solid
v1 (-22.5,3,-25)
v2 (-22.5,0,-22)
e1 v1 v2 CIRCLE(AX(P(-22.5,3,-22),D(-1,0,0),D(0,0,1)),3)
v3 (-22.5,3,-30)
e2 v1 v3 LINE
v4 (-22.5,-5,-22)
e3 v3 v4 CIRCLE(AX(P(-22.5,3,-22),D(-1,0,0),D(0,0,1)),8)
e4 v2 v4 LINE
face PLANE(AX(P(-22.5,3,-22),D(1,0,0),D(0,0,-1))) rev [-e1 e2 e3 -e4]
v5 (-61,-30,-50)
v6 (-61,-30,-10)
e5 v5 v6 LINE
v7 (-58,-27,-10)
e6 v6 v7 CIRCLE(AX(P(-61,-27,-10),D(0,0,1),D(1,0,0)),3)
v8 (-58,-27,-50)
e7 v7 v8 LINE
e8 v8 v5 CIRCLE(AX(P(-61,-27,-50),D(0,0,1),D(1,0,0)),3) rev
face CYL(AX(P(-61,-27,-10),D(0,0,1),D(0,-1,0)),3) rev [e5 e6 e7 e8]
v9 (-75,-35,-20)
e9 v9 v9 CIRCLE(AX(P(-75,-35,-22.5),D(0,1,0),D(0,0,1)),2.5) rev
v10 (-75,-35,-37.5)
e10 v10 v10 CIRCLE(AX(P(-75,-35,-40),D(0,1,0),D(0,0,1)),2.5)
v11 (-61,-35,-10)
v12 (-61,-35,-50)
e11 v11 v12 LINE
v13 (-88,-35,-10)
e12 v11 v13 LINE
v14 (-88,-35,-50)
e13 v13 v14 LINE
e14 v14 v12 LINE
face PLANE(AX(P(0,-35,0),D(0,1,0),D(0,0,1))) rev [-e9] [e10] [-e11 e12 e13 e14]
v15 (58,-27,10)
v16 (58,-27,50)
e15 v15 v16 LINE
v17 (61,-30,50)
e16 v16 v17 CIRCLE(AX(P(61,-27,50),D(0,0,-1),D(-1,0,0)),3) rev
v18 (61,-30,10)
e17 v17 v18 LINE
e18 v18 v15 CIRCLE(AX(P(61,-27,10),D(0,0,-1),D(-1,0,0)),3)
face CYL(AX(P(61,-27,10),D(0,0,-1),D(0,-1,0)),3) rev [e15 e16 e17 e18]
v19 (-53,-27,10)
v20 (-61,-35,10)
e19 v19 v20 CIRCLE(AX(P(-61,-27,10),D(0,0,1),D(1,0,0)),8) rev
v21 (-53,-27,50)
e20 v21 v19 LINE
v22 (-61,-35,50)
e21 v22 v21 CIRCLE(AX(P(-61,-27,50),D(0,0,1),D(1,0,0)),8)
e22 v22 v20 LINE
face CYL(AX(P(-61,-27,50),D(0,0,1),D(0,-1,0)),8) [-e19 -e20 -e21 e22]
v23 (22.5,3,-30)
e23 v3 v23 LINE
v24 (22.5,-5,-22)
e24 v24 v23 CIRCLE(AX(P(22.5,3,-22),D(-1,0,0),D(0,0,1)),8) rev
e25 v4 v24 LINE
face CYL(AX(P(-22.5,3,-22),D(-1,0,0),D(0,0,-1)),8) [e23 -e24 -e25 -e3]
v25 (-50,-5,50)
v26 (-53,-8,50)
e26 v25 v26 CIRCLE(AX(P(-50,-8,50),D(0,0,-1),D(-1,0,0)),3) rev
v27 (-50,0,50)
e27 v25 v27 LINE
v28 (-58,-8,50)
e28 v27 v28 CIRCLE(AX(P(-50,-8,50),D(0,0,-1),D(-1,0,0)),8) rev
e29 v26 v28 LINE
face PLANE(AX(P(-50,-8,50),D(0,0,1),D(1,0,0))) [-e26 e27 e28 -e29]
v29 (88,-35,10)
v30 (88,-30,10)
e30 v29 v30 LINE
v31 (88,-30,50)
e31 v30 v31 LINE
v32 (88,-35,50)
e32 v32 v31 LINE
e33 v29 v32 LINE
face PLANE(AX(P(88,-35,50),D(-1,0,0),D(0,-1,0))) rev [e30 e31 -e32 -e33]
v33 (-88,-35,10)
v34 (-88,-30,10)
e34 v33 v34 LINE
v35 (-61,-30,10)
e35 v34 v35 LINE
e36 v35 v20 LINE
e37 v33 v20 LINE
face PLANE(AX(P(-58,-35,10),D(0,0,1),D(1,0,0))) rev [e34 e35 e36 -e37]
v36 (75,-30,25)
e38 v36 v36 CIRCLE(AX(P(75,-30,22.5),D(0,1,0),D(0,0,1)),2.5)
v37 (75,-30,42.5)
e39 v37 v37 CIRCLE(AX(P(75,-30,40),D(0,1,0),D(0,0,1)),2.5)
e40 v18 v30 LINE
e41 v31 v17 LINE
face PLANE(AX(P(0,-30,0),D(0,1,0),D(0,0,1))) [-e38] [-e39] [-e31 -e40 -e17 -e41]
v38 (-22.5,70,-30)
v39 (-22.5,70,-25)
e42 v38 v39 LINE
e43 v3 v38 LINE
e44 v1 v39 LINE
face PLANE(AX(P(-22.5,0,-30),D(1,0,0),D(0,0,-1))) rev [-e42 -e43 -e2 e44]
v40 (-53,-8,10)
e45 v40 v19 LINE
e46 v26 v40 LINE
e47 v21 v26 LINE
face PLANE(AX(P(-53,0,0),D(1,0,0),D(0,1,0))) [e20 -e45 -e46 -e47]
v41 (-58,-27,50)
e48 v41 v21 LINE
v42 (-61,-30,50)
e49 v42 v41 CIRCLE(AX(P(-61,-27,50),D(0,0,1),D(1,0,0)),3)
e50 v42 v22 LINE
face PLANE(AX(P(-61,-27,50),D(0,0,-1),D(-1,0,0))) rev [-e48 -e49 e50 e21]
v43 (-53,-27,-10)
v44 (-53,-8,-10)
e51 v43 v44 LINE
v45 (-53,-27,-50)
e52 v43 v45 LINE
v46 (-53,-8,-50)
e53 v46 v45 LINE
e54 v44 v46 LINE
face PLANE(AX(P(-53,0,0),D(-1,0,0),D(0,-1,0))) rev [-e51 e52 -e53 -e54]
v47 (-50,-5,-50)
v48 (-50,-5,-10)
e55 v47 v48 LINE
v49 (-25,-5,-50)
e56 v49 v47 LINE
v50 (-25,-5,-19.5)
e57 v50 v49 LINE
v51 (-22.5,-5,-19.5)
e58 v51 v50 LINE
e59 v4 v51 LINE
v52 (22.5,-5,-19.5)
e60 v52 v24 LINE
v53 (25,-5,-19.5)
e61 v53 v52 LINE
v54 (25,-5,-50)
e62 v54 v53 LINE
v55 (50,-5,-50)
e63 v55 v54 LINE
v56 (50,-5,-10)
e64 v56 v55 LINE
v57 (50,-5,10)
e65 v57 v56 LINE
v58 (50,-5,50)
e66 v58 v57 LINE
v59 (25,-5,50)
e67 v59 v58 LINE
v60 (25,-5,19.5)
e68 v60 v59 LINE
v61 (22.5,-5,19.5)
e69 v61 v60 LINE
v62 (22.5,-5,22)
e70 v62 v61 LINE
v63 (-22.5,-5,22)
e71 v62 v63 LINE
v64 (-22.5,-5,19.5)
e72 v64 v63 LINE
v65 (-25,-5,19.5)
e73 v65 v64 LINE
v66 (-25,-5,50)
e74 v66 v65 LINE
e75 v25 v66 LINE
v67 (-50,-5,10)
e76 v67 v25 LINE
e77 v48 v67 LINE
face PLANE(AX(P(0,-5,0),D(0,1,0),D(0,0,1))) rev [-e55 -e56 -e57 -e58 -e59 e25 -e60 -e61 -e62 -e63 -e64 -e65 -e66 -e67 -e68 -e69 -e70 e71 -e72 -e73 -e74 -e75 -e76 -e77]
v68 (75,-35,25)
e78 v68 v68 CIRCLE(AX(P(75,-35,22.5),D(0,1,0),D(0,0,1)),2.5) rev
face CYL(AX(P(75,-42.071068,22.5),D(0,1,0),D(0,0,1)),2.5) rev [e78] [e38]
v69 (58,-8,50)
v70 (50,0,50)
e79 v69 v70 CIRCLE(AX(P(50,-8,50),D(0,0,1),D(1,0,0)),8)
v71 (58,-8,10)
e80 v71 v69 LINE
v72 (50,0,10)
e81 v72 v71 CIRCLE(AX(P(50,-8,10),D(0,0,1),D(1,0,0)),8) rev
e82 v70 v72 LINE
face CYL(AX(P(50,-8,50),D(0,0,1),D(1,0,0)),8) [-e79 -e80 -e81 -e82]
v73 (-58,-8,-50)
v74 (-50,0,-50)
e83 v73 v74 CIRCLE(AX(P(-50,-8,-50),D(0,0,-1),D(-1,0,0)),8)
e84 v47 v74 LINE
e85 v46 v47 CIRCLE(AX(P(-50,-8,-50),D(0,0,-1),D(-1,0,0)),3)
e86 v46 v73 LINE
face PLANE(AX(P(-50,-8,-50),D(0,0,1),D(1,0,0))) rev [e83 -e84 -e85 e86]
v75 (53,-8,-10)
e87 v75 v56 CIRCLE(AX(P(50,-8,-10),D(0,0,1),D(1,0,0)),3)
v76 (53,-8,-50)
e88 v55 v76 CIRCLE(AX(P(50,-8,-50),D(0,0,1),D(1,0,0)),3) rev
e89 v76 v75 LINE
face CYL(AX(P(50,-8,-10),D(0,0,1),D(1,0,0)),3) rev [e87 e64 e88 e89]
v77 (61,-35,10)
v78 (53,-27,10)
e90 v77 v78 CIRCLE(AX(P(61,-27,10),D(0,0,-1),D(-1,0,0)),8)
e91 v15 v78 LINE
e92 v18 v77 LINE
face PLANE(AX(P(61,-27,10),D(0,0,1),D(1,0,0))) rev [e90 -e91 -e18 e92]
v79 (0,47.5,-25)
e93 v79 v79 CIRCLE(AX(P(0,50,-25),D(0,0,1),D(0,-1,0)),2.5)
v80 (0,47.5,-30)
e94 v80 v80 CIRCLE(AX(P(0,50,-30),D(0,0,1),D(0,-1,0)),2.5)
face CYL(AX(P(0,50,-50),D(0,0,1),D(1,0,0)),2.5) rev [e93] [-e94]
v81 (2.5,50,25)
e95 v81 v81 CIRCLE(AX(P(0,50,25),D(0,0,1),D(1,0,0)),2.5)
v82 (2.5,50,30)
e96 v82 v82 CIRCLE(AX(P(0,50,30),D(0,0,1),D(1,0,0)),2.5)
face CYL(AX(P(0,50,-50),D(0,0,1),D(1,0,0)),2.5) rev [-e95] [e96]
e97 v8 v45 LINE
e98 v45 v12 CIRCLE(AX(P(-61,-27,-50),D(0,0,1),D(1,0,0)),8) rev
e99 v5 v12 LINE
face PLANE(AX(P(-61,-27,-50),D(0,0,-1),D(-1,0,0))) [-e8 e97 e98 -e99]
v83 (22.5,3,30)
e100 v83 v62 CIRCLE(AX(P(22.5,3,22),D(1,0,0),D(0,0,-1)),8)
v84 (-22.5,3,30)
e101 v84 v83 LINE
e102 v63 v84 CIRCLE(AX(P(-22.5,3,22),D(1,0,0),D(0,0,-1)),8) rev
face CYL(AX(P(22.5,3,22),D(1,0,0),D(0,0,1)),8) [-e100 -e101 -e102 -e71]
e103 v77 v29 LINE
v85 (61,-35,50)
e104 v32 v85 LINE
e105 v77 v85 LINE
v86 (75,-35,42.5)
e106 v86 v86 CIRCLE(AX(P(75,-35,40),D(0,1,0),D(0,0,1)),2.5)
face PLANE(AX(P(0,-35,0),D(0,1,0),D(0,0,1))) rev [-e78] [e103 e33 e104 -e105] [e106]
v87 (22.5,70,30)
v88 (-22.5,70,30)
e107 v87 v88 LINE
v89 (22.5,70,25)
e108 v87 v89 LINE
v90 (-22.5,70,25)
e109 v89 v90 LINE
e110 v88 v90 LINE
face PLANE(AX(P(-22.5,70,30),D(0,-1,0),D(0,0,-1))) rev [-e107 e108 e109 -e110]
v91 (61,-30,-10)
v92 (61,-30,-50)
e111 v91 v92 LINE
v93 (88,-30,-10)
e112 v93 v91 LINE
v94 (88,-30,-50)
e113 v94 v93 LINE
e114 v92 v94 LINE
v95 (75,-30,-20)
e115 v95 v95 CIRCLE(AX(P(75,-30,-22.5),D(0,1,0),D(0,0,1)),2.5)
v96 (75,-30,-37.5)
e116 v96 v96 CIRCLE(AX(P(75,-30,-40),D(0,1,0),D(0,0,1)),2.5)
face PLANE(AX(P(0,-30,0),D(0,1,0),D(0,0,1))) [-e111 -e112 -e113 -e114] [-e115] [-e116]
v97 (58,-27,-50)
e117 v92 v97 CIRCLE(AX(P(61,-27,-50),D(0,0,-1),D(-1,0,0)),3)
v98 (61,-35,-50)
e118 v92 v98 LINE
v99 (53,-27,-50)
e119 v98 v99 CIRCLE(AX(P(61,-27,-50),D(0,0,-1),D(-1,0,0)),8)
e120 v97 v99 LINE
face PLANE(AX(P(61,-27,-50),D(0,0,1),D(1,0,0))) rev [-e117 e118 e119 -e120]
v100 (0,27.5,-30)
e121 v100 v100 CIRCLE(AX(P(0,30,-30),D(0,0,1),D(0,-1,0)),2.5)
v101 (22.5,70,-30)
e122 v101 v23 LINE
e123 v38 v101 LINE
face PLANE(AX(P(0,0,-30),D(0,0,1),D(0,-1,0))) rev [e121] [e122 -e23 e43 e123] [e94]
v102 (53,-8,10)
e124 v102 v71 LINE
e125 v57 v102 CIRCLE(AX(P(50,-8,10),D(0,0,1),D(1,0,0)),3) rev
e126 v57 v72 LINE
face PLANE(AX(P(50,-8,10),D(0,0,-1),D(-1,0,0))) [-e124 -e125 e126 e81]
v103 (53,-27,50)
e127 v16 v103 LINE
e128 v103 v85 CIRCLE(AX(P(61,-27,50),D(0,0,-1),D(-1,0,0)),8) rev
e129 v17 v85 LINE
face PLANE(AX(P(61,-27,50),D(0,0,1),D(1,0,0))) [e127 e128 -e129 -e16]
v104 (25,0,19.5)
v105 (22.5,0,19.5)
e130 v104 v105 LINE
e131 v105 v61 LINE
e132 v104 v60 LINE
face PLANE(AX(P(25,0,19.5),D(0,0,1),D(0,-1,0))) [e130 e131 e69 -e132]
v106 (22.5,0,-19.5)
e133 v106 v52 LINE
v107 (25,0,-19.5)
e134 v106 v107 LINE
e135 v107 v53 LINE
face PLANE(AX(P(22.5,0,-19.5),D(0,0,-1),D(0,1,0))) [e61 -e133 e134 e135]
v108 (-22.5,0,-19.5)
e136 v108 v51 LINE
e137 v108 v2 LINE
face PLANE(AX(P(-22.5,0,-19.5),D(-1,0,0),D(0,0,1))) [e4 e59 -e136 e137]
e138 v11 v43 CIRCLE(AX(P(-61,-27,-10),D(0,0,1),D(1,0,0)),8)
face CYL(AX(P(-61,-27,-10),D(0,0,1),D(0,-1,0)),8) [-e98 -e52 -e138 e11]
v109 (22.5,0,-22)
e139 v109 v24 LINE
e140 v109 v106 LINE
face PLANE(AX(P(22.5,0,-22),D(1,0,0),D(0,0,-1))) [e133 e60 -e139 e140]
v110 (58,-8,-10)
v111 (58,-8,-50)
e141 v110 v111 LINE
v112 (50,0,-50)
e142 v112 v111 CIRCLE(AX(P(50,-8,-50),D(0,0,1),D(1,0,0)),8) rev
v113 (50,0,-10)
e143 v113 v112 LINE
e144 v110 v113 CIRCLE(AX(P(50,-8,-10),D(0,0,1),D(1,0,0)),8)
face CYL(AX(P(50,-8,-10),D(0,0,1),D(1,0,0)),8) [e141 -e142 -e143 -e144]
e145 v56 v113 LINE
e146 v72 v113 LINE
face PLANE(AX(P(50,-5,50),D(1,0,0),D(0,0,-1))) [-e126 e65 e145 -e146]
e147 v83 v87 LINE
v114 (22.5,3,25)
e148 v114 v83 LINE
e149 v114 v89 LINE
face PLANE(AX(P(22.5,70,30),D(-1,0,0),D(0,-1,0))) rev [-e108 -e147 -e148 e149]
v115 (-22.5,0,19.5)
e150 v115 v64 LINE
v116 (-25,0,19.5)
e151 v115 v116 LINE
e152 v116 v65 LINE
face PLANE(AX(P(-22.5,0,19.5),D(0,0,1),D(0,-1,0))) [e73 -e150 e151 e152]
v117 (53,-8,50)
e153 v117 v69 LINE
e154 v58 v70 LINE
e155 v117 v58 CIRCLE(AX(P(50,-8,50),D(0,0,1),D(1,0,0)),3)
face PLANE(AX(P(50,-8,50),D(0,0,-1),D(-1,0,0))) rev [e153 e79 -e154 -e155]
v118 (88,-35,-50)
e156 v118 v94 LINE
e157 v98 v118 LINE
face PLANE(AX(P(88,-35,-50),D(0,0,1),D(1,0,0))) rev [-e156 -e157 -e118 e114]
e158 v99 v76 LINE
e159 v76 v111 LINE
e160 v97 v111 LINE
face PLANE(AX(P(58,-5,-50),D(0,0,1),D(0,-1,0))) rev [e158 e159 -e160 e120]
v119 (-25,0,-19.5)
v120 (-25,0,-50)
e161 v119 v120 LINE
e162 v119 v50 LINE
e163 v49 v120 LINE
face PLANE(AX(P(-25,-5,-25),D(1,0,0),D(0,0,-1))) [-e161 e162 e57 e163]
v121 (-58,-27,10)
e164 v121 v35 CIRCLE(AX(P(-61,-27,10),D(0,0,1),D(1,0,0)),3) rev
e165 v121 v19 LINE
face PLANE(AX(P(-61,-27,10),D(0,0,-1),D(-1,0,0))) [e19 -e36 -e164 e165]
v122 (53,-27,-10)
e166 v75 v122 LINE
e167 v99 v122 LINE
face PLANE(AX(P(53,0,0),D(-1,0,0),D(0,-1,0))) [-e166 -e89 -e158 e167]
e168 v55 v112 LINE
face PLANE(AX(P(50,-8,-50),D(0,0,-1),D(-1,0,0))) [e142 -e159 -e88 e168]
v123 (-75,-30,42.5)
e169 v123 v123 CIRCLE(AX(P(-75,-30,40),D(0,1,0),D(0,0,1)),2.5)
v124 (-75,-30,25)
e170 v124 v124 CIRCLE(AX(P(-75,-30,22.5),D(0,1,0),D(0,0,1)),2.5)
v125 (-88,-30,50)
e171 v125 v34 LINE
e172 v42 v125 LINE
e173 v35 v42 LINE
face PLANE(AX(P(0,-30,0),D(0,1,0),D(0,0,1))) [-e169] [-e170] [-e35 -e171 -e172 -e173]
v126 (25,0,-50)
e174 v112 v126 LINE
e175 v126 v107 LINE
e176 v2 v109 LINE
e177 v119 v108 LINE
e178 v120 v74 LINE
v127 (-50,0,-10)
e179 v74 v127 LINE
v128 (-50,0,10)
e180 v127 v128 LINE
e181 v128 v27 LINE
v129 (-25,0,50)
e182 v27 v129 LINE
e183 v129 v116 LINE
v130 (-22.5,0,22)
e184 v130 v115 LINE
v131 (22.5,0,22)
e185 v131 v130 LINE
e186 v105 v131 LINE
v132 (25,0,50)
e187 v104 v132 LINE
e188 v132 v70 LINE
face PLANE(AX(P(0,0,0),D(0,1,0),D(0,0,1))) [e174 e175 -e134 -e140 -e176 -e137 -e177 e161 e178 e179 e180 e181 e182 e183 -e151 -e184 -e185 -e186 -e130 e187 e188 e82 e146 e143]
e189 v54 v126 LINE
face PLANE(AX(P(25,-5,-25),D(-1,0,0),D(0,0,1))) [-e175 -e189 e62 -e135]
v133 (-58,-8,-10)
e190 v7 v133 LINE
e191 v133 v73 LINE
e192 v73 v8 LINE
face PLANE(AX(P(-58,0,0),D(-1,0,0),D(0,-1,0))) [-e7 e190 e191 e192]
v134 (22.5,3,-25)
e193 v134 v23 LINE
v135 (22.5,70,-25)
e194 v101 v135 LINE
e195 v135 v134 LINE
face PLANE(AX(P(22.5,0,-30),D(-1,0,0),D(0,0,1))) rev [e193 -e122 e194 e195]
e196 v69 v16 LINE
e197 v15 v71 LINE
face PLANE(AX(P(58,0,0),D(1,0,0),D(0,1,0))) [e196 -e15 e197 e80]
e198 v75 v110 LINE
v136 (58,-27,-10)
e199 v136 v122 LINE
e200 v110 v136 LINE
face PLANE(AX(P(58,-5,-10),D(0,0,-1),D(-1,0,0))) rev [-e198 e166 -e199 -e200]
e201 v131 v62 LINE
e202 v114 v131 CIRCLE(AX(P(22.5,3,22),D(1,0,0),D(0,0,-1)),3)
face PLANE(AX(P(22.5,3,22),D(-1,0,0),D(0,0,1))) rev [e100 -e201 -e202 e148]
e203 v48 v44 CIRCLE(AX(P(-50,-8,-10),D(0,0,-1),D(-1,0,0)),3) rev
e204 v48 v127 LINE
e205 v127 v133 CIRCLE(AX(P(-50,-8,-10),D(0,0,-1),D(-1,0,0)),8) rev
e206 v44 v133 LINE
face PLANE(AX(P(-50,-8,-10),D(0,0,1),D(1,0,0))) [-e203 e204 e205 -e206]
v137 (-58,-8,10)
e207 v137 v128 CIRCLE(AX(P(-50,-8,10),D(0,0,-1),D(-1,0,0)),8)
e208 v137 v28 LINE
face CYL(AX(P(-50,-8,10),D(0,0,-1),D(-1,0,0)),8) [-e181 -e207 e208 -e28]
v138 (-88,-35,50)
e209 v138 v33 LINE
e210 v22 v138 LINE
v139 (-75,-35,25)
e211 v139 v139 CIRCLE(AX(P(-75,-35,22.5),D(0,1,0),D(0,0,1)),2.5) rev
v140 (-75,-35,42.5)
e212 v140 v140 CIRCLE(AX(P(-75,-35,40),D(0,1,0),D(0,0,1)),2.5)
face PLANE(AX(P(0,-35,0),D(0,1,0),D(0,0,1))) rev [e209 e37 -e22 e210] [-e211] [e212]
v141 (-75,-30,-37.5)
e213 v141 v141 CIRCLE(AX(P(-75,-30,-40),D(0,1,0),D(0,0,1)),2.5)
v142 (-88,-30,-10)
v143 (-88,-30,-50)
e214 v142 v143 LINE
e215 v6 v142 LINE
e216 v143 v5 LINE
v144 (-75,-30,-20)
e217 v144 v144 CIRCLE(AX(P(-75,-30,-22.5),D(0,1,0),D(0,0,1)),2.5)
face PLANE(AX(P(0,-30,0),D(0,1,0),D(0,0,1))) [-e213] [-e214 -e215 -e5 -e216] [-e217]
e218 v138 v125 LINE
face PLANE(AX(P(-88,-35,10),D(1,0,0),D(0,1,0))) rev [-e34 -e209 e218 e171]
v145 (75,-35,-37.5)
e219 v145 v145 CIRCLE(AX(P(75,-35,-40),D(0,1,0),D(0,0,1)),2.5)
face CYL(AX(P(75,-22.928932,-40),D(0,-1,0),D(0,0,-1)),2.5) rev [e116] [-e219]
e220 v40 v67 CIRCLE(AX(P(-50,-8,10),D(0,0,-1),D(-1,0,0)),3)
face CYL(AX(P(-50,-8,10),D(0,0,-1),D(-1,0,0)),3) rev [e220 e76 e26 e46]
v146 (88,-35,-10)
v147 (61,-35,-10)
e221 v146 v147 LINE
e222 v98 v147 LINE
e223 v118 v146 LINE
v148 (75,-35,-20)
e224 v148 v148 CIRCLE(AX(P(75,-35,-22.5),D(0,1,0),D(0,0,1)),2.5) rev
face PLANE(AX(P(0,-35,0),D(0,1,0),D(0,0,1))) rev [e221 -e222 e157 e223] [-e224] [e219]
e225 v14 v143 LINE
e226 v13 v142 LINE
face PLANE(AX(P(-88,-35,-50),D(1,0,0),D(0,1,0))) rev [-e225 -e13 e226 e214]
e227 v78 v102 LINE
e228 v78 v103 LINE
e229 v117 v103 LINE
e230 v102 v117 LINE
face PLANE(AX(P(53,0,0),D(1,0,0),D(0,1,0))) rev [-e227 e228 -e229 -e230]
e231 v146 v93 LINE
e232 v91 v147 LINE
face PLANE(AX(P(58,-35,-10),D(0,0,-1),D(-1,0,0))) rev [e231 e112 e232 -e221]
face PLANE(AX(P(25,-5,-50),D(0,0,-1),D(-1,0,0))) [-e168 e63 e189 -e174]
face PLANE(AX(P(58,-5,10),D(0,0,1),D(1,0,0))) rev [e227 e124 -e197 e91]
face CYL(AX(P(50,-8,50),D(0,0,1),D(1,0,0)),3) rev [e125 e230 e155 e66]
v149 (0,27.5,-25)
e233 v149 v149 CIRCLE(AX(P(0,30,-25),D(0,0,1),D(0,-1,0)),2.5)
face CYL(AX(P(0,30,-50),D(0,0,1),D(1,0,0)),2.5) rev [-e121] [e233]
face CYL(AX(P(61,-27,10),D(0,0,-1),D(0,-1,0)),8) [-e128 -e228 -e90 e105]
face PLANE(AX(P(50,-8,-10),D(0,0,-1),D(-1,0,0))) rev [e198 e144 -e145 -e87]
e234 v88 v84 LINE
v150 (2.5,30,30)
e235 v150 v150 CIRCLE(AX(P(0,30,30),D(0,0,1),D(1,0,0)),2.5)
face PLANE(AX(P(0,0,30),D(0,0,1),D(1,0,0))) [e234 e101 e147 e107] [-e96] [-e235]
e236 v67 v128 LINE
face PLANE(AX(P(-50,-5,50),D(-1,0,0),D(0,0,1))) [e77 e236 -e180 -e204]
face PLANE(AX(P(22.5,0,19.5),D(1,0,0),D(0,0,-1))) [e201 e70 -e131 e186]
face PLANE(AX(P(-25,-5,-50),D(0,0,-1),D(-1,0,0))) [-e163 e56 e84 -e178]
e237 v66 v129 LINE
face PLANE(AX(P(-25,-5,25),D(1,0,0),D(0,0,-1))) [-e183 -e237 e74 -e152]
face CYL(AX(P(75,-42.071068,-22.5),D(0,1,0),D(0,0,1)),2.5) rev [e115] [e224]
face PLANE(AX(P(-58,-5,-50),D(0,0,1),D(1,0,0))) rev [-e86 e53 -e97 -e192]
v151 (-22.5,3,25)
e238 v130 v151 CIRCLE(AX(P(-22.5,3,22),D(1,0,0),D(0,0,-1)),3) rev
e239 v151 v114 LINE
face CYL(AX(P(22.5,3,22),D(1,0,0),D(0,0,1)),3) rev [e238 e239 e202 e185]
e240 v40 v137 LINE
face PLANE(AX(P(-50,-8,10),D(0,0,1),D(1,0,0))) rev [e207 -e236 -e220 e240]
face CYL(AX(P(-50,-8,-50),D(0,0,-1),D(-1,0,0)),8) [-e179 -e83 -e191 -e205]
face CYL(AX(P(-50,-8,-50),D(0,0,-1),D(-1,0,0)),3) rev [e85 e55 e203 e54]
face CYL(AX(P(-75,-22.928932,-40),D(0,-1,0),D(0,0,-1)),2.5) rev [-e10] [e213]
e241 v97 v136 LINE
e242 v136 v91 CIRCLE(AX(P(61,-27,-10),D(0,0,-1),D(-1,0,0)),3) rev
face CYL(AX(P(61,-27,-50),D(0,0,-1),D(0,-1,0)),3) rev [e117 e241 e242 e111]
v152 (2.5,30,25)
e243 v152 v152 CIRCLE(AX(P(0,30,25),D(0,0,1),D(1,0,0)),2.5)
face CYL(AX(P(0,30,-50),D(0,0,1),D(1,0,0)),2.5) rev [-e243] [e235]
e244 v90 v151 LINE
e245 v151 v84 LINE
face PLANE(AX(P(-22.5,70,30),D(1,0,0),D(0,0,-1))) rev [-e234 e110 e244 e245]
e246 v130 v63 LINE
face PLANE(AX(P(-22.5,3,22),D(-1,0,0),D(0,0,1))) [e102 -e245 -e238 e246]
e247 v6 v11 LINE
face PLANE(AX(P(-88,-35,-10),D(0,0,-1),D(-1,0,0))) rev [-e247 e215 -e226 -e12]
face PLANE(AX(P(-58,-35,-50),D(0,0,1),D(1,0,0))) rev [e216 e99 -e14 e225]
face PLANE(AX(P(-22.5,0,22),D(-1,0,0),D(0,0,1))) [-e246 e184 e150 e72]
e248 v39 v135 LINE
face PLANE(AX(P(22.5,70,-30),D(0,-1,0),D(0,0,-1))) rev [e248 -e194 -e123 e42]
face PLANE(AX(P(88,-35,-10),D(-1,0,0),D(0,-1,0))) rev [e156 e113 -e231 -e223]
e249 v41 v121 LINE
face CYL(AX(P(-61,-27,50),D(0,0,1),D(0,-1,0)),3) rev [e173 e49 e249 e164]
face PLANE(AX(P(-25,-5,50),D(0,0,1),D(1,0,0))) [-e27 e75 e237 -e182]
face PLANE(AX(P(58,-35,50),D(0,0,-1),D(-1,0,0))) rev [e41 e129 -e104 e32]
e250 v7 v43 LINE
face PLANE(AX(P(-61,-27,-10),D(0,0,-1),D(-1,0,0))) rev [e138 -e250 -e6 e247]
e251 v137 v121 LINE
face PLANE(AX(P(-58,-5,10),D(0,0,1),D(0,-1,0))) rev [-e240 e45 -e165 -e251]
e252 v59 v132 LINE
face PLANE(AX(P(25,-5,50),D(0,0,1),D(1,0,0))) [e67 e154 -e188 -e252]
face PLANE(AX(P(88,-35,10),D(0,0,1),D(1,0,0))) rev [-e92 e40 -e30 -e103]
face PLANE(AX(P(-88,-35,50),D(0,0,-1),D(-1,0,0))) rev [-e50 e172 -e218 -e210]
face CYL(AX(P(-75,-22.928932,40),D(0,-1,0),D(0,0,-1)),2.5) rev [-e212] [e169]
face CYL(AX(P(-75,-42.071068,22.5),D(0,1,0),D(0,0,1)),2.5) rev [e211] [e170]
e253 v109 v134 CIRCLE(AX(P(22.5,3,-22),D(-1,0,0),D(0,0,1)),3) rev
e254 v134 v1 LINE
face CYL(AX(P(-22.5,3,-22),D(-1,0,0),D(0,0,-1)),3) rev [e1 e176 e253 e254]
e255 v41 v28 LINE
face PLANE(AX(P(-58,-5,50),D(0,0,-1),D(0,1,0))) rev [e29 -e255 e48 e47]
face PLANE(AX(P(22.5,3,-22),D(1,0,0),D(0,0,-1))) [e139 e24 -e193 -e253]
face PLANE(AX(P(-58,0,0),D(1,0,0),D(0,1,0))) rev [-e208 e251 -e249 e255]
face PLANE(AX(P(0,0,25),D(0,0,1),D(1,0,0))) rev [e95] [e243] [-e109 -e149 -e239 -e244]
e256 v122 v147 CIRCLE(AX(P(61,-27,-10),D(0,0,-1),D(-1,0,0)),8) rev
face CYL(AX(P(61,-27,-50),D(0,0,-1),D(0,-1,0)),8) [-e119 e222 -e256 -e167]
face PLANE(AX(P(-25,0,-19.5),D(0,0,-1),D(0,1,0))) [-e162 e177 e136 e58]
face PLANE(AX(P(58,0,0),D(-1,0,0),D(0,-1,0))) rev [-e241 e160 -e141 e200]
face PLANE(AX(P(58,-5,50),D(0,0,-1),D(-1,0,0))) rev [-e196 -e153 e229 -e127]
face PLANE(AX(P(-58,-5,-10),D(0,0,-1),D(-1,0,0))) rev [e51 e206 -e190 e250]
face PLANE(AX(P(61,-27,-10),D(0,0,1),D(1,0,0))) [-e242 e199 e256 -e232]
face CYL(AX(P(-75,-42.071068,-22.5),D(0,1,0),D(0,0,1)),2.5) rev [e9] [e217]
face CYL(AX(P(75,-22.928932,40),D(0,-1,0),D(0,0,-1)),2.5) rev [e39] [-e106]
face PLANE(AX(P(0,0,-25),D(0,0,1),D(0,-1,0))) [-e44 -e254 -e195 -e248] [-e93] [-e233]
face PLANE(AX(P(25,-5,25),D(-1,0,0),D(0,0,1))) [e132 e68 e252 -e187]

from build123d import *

# Parameters (mm, degrees)
SM_BASE_FLANGE_1_DEPTH            = 5
SM_EDGE_FLANGE_1_STRIP_W          = 26
SM_EDGE_FLANGE_1_STRIP_H          = 5
SM_EDGE_FLANGE_1_STRIP_CUT_DEPTH  = 45
SM_EDGE_FLANGE_1_RELIEF_W         = 28.5
SM_EDGE_FLANGE_1_RELIEF_H         = 2.5
SM_EDGE_FLANGE_1_RELIEF_CUT_DEPTH = 5
SM_EDGE_FLANGE_1_DEPTH            = 45
SM_EDGE_FLANGE_2_STRIP_W          = 26
SM_EDGE_FLANGE_2_STRIP_H          = 5
SM_EDGE_FLANGE_2_STRIP_CUT_DEPTH  = 45
SM_EDGE_FLANGE_2_RELIEF_W         = 28.5
SM_EDGE_FLANGE_2_RELIEF_H         = 2.5
SM_EDGE_FLANGE_2_RELIEF_CUT_DEPTH = 5
SM_EDGE_FLANGE_2_DEPTH            = 45
SM_EDGE_FLANGE_14_DEPTH           = 40
SM_EDGE_FLANGE_15_DEPTH           = 40
SM_EDGE_FLANGE_16_DEPTH           = 40
SM_EDGE_FLANGE_17_DEPTH           = 40
SM_EDGE_FLANGE_18_STRIP_W         = 26
SM_EDGE_FLANGE_18_STRIP_H         = 5
SM_EDGE_FLANGE_18_STRIP_CUT_DEPTH = 40
SM_EDGE_FLANGE_18_DEPTH           = 40
SM_EDGE_FLANGE_19_STRIP_W         = 26
SM_EDGE_FLANGE_19_STRIP_H         = 5
SM_EDGE_FLANGE_19_STRIP_CUT_DEPTH = 40
SM_EDGE_FLANGE_19_DEPTH           = 40
SM_EDGE_FLANGE_20_STRIP_W         = 26
SM_EDGE_FLANGE_20_STRIP_H         = 5
SM_EDGE_FLANGE_20_STRIP_CUT_DEPTH = 40
SM_EDGE_FLANGE_20_DEPTH           = 40
SM_EDGE_FLANGE_21_STRIP_W         = 26
SM_EDGE_FLANGE_21_STRIP_H         = 5
SM_EDGE_FLANGE_21_STRIP_CUT_DEPTH = 40
SM_EDGE_FLANGE_21_DEPTH           = 40
CUT_EXTRUDE_START                 = -35
SKETCH_80_R                       = 2.5
CUT_EXTRUDE_1_DEPTH               = 5
CUT_EXTRUDE_3_DEPTH               = 124.060960503
CUT_EXTRUDE_3_DEPTH_BACK          = 124.060960503
SKETCH_83_R                       = 2.5
CUT_EXTRUDE_START_2               = -30
SKETCH_84_R                       = 2.5
CUT_EXTRUDE_5_DEPTH               = 5


# Sheet-metal steps are written as plain solids
with BuildPart() as part:
    # Sketch 1 → 基体-法兰1 (new body)
    with BuildSketch(Plane(origin=(0, 0, 0), x_dir=(1, 0, 0), z_dir=(0, 1, 0))):
        Polygon((-25, -25), (-25, -50), (-50, -50), (-50, 50), (-25, 50), (-25, 25), (25, 25), (25, 50), (50, 50), (50, -50), (25, -50), (25, -25), align=None)
    extrude(amount=-SM_BASE_FLANGE_1_DEPTH)

    # 边线-法兰1 strip (across the edge) → 边线-法兰1 strip cut (cut)
    with BuildSketch(Plane(origin=(22.5, 0, -25), x_dir=(0, 0, 1), z_dir=(-1, 0, 0))):
        with Locations((-10, -2.5)):
            Rectangle(SM_EDGE_FLANGE_1_STRIP_W, SM_EDGE_FLANGE_1_STRIP_H)
    extrude(amount=SM_EDGE_FLANGE_1_STRIP_CUT_DEPTH, mode=Mode.SUBTRACT)

    # 边线-法兰1 relief (on the sheet) → 边线-法兰1 relief cut (cut)
    with BuildSketch(Plane(origin=(22.5, 0, -22), x_dir=(0, 0, 1), z_dir=(0, 1, 0))):
        with Locations((-11.75, 1.25)):
            Rectangle(SM_EDGE_FLANGE_1_RELIEF_W, SM_EDGE_FLANGE_1_RELIEF_H)
        with Locations((-11.75, -46.25)):
            Rectangle(SM_EDGE_FLANGE_1_RELIEF_W, SM_EDGE_FLANGE_1_RELIEF_H)
    extrude(amount=-SM_EDGE_FLANGE_1_RELIEF_CUT_DEPTH, mode=Mode.SUBTRACT)

    # 边线-法兰1 section (across the edge) → 边线-法兰1 (add)
    with BuildSketch(Plane(origin=(22.5, 0, -25), x_dir=(0, 0, 1), z_dir=(-1, 0, 0))):
        with BuildLine():
            Line((-5, 3), (-5, 70))
            Line((-5, 70), (0, 70))
            Line((0, 70), (0, 3))
            ThreePointArc((0, 3), (0.878679656, 0.878679656), (3, 0))
            Line((3, 0), (3, -5))
            ThreePointArc((3, -5), (-2.656854249, -2.656854249), (-5, 3))
        make_face()
    extrude(amount=SM_EDGE_FLANGE_1_DEPTH)

    # 边线-法兰2 strip (across the edge) → 边线-法兰2 strip cut (cut)
    with BuildSketch(Plane(origin=(-22.5, 0, 25), x_dir=(0, 0, -1), z_dir=(1, 0, 0))):
        with Locations((-10, -2.5)):
            Rectangle(SM_EDGE_FLANGE_2_STRIP_W, SM_EDGE_FLANGE_2_STRIP_H)
    extrude(amount=SM_EDGE_FLANGE_2_STRIP_CUT_DEPTH, mode=Mode.SUBTRACT)

    # 边线-法兰2 relief (on the sheet) → 边线-法兰2 relief cut (cut)
    with BuildSketch(Plane(origin=(-22.5, 0, 22), x_dir=(0, 0, -1), z_dir=(0, 1, 0))):
        with Locations((-11.75, 1.25)):
            Rectangle(SM_EDGE_FLANGE_2_RELIEF_W, SM_EDGE_FLANGE_2_RELIEF_H)
        with Locations((-11.75, -46.25)):
            Rectangle(SM_EDGE_FLANGE_2_RELIEF_W, SM_EDGE_FLANGE_2_RELIEF_H)
    extrude(amount=-SM_EDGE_FLANGE_2_RELIEF_CUT_DEPTH, mode=Mode.SUBTRACT)

    # 边线-法兰2 section (across the edge) → 边线-法兰2 (add)
    with BuildSketch(Plane(origin=(-22.5, 0, 25), x_dir=(0, 0, -1), z_dir=(1, 0, 0))):
        with BuildLine():
            Line((-5, 3), (-5, 70))
            Line((-5, 70), (0, 70))
            Line((0, 70), (0, 3))
            ThreePointArc((0, 3), (0.878679656, 0.878679656), (3, 0))
            Line((3, 0), (3, -5))
            ThreePointArc((3, -5), (-2.656854249, -2.656854249), (-5, 3))
        make_face()
    extrude(amount=SM_EDGE_FLANGE_2_DEPTH)

    # 边线-法兰14 section (across the edge) → 边线-法兰14 (add)
    with BuildSketch(Plane(origin=(53, -5, 10), x_dir=(-1, 0, 0), z_dir=(0, 0, 1))):
        with BuildLine():
            Line((-5, 3), (-5, 30))
            Line((-5, 30), (0, 30))
            Line((0, 30), (0, 3))
            ThreePointArc((0, 3), (0.878679656, 0.878679656), (3, 0))
            Line((3, 0), (3, -5))
            ThreePointArc((3, -5), (-2.656854249, -2.656854249), (-5, 3))
        make_face()
    extrude(amount=SM_EDGE_FLANGE_14_DEPTH)

    # 边线-法兰15 section (across the edge) → 边线-法兰15 (add)
    with BuildSketch(Plane(origin=(53, -5, -50), x_dir=(-1, 0, 0), z_dir=(0, 0, 1))):
        with BuildLine():
            Line((-5, 3), (-5, 30))
            Line((-5, 30), (0, 30))
            Line((0, 30), (0, 3))
            ThreePointArc((0, 3), (0.878679656, 0.878679656), (3, 0))
            Line((3, 0), (3, -5))
            ThreePointArc((3, -5), (-2.656854249, -2.656854249), (-5, 3))
        make_face()
    extrude(amount=SM_EDGE_FLANGE_15_DEPTH)

    # 边线-法兰16 section (across the edge) → 边线-法兰16 (add)
    with BuildSketch(Plane(origin=(-53, -5, -10), x_dir=(1, 0, 0), z_dir=(0, 0, -1))):
        with BuildLine():
            Line((-5, 3), (-5, 30))
            Line((-5, 30), (0, 30))
            Line((0, 30), (0, 3))
            ThreePointArc((0, 3), (0.878679656, 0.878679656), (3, 0))
            Line((3, 0), (3, -5))
            ThreePointArc((3, -5), (-2.656854249, -2.656854249), (-5, 3))
        make_face()
    extrude(amount=SM_EDGE_FLANGE_16_DEPTH)

    # 边线-法兰17 section (across the edge) → 边线-法兰17 (add)
    with BuildSketch(Plane(origin=(-53, -5, 50), x_dir=(1, 0, 0), z_dir=(0, 0, -1))):
        with BuildLine():
            Line((-5, 3), (-5, 30))
            Line((-5, 30), (0, 30))
            Line((0, 30), (0, 3))
            ThreePointArc((0, 3), (0.878679656, 0.878679656), (3, 0))
            Line((3, 0), (3, -5))
            ThreePointArc((3, -5), (-2.656854249, -2.656854249), (-5, 3))
        make_face()
    extrude(amount=SM_EDGE_FLANGE_17_DEPTH)

    # 边线-法兰18 strip (across the edge) → 边线-法兰18 strip cut (cut)
    with BuildSketch(Plane(origin=(-58, -35, -50), x_dir=(0, 1, 0), z_dir=(0, 0, 1))):
        with Locations((-5, -2.5)):
            Rectangle(SM_EDGE_FLANGE_18_STRIP_W, SM_EDGE_FLANGE_18_STRIP_H)
    extrude(amount=SM_EDGE_FLANGE_18_STRIP_CUT_DEPTH, mode=Mode.SUBTRACT)

    # 边线-法兰18 section (across the edge) → 边线-法兰18 (add)
    with BuildSketch(Plane(origin=(-58, -35, -50), x_dir=(0, 1, 0), z_dir=(0, 0, 1))):
        with BuildLine():
            Line((0, 3), (0, 30))
            Line((0, 30), (5, 30))
            Line((5, 30), (5, 3))
            ThreePointArc((5, 3), (5.878679656, 0.878679656), (8, 0))
            Line((8, 0), (8, -5))
            ThreePointArc((8, -5), (2.343145751, -2.656854249), (0, 3))
        make_face()
    extrude(amount=SM_EDGE_FLANGE_18_DEPTH)

    # 边线-法兰19 strip (across the edge) → 边线-法兰19 strip cut (cut)
    with BuildSketch(Plane(origin=(-58, -35, 10), x_dir=(0, 1, 0), z_dir=(0, 0, 1))):
        with Locations((-5, -2.5)):
            Rectangle(SM_EDGE_FLANGE_19_STRIP_W, SM_EDGE_FLANGE_19_STRIP_H)
    extrude(amount=SM_EDGE_FLANGE_19_STRIP_CUT_DEPTH, mode=Mode.SUBTRACT)

    # 边线-法兰19 section (across the edge) → 边线-法兰19 (add)
    with BuildSketch(Plane(origin=(-58, -35, 10), x_dir=(0, 1, 0), z_dir=(0, 0, 1))):
        with BuildLine():
            Line((0, 3), (0, 30))
            Line((0, 30), (5, 30))
            Line((5, 30), (5, 3))
            ThreePointArc((5, 3), (5.878679656, 0.878679656), (8, 0))
            Line((8, 0), (8, -5))
            ThreePointArc((8, -5), (2.343145751, -2.656854249), (0, 3))
        make_face()
    extrude(amount=SM_EDGE_FLANGE_19_DEPTH)

    # 边线-法兰20 strip (across the edge) → 边线-法兰20 strip cut (cut)
    with BuildSketch(Plane(origin=(58, -35, 50), x_dir=(0, 1, 0), z_dir=(0, 0, -1))):
        with Locations((-5, -2.5)):
            Rectangle(SM_EDGE_FLANGE_20_STRIP_W, SM_EDGE_FLANGE_20_STRIP_H)
    extrude(amount=SM_EDGE_FLANGE_20_STRIP_CUT_DEPTH, mode=Mode.SUBTRACT)

    # 边线-法兰20 section (across the edge) → 边线-法兰20 (add)
    with BuildSketch(Plane(origin=(58, -35, 50), x_dir=(0, 1, 0), z_dir=(0, 0, -1))):
        with BuildLine():
            Line((0, 3), (0, 30))
            Line((0, 30), (5, 30))
            Line((5, 30), (5, 3))
            ThreePointArc((5, 3), (5.878679656, 0.878679656), (8, 0))
            Line((8, 0), (8, -5))
            ThreePointArc((8, -5), (2.343145751, -2.656854249), (0, 3))
        make_face()
    extrude(amount=SM_EDGE_FLANGE_20_DEPTH)

    # 边线-法兰21 strip (across the edge) → 边线-法兰21 strip cut (cut)
    with BuildSketch(Plane(origin=(58, -35, -10), x_dir=(0, 1, 0), z_dir=(0, 0, -1))):
        with Locations((-5, -2.5)):
            Rectangle(SM_EDGE_FLANGE_21_STRIP_W, SM_EDGE_FLANGE_21_STRIP_H)
    extrude(amount=SM_EDGE_FLANGE_21_STRIP_CUT_DEPTH, mode=Mode.SUBTRACT)

    # 边线-法兰21 section (across the edge) → 边线-法兰21 (add)
    with BuildSketch(Plane(origin=(58, -35, -10), x_dir=(0, 1, 0), z_dir=(0, 0, -1))):
        with BuildLine():
            Line((0, 3), (0, 30))
            Line((0, 30), (5, 30))
            Line((5, 30), (5, 3))
            ThreePointArc((5, 3), (5.878679656, 0.878679656), (8, 0))
            Line((8, 0), (8, -5))
            ThreePointArc((8, -5), (2.343145751, -2.656854249), (0, 3))
        make_face()
    extrude(amount=SM_EDGE_FLANGE_21_DEPTH)

    # 草图80 → 切除-拉伸1 (cut)
    with BuildSketch(Plane(origin=(0, 0, 0), x_dir=(1, 0, 0), z_dir=(0, 1, 0)).offset(CUT_EXTRUDE_START)):
        with Locations(Location((-75, 40, 0), (0, 0, 270))):
            Circle(SKETCH_80_R)
        with Locations(Location((75, 40, 0), (0, 0, 270))):
            Circle(SKETCH_80_R)
        with Locations(Location((-75, -40, 0), (0, 0, 270))):
            Circle(SKETCH_80_R)
        with Locations(Location((75, -40, 0), (0, 0, 270))):
            Circle(SKETCH_80_R)
    extrude(amount=CUT_EXTRUDE_1_DEPTH, mode=Mode.SUBTRACT)

    # 草图83 → 切除-拉伸3 (cut, two sides: drawn at the far end of the back side and taken through both)
    with BuildSketch(Plane.XY.offset(-CUT_EXTRUDE_3_DEPTH_BACK)):
        with Locations((0, 50)):
            Circle(SKETCH_83_R)
        with Locations((0, 30)):
            Circle(SKETCH_83_R)
    extrude(amount=CUT_EXTRUDE_3_DEPTH + CUT_EXTRUDE_3_DEPTH_BACK, mode=Mode.SUBTRACT)

    # 草图84 → 切除-拉伸5 (cut)
    with BuildSketch(Plane(origin=(0, 0, 0), x_dir=(1, 0, 0), z_dir=(0, 1, 0)).offset(CUT_EXTRUDE_START_2)):
        with Locations(Location((75, 22.5, 0), (0, 0, 270))):
            Circle(SKETCH_84_R)
        with Locations(Location((75, -22.5, 0), (0, 0, 270))):
            Circle(SKETCH_84_R)
        with Locations(Location((-75, -22.5, 0), (0, 0, 270))):
            Circle(SKETCH_84_R)
        with Locations(Location((-75, 22.5, 0), (0, 0, 270))):
            Circle(SKETCH_84_R)
    extrude(amount=-CUT_EXTRUDE_5_DEPTH, mode=Mode.SUBTRACT)


solid = part.part
